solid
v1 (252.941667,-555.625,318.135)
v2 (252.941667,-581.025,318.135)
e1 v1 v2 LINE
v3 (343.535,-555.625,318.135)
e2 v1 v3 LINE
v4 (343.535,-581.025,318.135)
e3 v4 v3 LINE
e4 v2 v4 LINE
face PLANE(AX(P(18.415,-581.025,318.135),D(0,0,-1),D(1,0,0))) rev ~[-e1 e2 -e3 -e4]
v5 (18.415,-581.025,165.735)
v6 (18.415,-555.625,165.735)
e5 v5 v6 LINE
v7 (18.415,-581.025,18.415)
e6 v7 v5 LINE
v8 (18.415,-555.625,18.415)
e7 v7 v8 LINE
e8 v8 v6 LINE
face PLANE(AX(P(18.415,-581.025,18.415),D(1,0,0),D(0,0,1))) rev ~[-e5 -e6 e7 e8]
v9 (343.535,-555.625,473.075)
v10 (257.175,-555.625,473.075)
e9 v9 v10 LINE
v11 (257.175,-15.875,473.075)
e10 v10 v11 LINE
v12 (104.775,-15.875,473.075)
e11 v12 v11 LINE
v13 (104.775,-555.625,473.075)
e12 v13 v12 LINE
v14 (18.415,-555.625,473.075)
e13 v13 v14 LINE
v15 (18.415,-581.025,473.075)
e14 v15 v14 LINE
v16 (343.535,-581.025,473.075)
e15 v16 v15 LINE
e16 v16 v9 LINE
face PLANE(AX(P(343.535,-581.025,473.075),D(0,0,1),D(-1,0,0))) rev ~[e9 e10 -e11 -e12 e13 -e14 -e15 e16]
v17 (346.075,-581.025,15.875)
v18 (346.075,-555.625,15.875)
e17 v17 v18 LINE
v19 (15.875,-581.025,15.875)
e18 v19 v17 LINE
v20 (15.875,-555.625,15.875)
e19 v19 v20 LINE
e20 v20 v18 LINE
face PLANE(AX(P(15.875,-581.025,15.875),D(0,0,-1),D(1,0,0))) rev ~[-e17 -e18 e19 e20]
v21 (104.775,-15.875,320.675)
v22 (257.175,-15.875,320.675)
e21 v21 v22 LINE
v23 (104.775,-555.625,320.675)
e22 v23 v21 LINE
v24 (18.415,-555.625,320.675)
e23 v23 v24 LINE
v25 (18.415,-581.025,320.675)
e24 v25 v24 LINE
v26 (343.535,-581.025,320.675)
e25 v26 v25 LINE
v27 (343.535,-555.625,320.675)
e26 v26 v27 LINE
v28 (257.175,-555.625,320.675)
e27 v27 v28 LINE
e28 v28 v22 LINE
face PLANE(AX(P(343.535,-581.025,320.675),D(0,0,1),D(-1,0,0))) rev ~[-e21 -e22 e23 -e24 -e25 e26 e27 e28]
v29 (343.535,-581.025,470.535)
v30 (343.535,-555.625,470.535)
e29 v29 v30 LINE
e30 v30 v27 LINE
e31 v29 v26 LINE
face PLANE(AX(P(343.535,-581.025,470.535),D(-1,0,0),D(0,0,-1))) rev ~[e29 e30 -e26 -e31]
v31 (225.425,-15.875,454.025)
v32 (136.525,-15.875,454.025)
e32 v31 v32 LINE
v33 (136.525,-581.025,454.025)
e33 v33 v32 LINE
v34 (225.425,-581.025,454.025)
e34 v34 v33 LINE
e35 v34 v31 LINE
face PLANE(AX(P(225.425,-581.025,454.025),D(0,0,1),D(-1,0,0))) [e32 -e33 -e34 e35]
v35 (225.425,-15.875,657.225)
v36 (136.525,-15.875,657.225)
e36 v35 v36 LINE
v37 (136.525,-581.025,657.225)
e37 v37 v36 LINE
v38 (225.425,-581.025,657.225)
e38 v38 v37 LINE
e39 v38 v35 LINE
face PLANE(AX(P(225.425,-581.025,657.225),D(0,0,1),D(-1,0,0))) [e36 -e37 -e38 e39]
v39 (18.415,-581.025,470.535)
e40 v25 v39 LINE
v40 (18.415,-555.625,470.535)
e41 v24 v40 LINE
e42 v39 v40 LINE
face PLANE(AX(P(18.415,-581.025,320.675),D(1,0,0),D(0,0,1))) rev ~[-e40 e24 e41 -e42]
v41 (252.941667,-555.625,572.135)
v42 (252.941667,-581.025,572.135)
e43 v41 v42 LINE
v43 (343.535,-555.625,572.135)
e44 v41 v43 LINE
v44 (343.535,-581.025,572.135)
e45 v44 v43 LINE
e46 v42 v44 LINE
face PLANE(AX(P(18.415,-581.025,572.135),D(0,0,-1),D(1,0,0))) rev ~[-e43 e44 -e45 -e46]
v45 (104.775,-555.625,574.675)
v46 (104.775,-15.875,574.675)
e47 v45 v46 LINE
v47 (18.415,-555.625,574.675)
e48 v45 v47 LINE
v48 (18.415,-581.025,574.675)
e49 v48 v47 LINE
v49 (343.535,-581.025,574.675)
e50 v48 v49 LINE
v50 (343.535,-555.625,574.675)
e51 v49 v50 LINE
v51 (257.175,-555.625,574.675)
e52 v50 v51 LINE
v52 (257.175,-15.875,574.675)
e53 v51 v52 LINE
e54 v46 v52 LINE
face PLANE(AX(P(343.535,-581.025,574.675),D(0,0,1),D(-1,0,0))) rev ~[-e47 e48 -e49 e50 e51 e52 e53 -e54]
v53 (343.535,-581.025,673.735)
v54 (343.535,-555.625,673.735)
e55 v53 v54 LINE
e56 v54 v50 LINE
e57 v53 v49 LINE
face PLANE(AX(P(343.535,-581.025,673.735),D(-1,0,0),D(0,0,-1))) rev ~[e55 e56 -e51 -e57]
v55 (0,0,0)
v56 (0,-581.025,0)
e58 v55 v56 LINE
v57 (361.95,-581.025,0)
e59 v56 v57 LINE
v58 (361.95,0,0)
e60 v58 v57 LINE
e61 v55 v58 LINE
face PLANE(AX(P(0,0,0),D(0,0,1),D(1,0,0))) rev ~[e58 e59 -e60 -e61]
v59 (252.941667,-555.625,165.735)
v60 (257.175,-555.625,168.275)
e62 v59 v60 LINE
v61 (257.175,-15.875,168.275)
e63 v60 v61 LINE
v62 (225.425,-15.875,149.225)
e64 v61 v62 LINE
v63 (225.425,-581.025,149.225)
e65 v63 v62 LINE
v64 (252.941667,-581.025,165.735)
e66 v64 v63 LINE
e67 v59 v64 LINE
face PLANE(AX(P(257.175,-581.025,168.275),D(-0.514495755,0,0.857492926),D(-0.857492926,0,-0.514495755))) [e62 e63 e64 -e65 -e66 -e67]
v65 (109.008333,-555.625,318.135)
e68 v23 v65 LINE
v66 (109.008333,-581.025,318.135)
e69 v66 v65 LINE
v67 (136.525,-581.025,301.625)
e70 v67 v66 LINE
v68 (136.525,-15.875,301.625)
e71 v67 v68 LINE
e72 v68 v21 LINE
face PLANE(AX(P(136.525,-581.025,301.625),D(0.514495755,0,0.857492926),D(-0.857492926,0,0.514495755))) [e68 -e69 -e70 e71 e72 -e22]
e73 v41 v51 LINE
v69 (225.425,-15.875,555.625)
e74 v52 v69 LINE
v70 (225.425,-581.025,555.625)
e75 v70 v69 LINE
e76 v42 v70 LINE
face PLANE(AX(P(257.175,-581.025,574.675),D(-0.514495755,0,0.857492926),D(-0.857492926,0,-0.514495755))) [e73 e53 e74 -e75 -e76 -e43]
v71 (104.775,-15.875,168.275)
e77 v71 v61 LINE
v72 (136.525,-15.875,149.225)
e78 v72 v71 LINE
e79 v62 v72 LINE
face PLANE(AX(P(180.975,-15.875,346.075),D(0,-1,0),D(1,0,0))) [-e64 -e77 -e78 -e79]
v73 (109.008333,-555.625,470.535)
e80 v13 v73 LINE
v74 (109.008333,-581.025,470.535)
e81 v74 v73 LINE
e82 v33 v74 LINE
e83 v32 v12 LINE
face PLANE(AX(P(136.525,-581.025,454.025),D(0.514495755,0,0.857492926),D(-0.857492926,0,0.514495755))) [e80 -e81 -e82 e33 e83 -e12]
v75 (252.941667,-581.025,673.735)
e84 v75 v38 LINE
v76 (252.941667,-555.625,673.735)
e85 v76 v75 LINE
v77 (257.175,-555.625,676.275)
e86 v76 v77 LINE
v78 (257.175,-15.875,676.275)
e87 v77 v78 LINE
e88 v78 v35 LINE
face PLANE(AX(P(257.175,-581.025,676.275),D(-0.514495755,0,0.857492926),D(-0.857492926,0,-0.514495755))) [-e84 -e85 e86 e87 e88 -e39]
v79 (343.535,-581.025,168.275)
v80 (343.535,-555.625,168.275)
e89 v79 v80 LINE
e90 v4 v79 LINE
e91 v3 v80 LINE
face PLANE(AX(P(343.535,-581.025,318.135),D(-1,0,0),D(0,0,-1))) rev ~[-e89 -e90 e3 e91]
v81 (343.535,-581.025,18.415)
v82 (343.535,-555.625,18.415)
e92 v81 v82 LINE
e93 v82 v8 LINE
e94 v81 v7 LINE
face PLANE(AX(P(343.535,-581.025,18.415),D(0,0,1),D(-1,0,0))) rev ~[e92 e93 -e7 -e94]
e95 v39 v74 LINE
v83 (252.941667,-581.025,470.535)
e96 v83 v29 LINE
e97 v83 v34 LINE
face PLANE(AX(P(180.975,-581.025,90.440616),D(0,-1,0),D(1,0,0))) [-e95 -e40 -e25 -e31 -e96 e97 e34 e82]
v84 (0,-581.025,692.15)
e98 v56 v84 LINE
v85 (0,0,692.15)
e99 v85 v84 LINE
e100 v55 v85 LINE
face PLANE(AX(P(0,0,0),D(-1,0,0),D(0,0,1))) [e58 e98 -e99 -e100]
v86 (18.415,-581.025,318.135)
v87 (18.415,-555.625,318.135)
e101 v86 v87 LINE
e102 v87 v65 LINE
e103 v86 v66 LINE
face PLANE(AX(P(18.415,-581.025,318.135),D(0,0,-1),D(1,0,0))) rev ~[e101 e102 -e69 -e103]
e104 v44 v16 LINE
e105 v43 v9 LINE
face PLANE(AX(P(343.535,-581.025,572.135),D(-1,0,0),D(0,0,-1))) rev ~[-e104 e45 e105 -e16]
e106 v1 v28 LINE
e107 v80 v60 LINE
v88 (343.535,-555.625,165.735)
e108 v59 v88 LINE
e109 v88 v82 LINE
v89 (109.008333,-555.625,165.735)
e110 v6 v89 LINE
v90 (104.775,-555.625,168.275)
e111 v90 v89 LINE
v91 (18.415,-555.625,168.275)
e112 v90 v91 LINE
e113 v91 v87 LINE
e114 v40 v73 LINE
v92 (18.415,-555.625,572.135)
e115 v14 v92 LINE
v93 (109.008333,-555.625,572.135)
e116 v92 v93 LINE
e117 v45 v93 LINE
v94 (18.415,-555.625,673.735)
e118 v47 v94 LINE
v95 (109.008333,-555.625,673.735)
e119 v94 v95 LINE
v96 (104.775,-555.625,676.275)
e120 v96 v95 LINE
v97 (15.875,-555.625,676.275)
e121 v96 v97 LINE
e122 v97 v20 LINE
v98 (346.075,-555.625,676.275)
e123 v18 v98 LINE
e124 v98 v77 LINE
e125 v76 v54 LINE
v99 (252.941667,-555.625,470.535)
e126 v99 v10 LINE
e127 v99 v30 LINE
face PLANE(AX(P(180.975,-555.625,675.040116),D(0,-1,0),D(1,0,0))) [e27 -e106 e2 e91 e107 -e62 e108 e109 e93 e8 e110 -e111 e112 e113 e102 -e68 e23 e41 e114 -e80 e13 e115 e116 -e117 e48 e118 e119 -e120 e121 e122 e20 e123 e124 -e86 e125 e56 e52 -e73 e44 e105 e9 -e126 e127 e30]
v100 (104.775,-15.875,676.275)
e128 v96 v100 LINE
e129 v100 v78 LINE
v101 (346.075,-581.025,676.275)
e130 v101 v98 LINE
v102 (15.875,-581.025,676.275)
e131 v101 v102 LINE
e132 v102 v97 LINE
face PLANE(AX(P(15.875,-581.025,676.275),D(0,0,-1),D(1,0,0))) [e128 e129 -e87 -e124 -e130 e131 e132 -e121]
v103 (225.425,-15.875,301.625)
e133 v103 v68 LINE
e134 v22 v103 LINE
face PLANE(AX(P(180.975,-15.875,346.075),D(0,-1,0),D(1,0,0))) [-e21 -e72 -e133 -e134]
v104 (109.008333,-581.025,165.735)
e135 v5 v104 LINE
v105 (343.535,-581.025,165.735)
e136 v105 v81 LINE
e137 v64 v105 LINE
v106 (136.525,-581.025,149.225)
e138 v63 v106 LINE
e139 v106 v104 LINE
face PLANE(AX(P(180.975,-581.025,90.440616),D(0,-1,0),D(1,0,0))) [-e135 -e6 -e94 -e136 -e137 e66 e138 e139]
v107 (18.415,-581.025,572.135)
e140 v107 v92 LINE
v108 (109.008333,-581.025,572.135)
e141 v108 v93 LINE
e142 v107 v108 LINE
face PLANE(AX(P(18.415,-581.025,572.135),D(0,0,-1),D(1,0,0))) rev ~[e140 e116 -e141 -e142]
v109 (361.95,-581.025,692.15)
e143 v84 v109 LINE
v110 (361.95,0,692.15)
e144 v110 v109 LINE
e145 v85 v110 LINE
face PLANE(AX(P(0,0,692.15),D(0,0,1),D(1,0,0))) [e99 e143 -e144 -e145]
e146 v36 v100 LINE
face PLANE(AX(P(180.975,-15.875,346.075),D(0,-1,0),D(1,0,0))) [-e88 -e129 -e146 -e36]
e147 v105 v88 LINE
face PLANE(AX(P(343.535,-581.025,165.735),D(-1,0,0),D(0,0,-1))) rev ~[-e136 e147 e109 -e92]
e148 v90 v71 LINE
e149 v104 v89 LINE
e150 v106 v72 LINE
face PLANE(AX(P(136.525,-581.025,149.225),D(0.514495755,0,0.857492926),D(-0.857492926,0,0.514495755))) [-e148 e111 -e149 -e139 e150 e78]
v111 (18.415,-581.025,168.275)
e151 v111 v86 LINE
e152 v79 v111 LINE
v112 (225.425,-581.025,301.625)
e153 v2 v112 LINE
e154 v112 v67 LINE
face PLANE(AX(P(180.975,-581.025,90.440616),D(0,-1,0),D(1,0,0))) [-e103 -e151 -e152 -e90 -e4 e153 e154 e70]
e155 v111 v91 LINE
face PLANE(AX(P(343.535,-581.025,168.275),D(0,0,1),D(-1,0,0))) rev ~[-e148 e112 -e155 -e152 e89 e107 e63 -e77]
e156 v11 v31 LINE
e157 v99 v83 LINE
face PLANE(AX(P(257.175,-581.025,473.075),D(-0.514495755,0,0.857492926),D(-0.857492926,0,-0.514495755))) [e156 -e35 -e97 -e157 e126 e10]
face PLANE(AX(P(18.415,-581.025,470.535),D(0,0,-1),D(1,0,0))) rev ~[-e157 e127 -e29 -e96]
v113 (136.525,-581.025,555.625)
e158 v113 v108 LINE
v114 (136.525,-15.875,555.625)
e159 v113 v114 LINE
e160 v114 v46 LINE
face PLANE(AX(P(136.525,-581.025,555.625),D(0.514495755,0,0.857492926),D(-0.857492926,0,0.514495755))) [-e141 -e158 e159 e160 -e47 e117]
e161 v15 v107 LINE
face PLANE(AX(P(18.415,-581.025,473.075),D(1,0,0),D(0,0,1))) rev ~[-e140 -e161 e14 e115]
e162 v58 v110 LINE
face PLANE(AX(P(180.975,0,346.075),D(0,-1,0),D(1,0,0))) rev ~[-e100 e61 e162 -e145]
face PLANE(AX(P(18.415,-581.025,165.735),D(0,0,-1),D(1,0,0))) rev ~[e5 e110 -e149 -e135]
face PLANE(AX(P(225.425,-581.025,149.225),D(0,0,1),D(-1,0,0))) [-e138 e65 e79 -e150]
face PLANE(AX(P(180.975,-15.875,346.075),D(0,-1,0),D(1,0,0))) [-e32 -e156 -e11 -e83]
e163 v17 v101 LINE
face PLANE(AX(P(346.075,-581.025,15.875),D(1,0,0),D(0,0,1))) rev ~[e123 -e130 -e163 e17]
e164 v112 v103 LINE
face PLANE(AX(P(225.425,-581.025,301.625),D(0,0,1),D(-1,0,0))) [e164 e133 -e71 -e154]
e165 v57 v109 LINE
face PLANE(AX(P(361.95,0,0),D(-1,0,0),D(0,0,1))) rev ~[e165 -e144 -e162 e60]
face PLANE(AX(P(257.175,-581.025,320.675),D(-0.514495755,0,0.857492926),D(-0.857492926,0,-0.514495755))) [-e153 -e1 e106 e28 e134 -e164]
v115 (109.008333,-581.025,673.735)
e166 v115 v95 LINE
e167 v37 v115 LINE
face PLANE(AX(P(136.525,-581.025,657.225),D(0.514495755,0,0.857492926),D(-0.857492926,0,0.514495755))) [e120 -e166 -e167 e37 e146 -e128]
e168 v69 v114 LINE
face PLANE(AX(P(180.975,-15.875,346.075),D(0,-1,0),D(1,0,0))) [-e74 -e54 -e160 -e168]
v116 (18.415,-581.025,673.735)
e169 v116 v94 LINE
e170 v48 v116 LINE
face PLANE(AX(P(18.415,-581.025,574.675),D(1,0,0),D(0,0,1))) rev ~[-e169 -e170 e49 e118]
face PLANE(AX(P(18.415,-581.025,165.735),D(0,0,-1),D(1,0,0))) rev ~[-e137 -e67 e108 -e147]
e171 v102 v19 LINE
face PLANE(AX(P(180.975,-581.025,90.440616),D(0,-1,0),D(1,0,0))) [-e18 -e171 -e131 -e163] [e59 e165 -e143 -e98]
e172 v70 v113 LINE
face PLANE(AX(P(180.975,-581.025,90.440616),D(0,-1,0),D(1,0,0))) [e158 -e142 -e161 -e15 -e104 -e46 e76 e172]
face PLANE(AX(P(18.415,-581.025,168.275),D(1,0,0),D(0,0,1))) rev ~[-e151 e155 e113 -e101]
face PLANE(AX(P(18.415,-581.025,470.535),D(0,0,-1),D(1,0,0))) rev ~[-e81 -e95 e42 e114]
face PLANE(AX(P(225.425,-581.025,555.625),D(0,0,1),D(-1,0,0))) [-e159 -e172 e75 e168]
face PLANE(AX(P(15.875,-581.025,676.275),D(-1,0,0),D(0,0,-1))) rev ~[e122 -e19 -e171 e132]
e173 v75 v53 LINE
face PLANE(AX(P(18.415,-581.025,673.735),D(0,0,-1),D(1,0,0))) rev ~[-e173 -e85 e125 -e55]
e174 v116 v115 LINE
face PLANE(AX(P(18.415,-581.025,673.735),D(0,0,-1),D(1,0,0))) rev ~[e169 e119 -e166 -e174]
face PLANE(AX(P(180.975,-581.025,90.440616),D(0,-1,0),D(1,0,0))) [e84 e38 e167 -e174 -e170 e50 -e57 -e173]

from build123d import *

# Parameters (mm, degrees)
F0_W     = 361.95
F0_H     = 692.15
F1_DEPTH = 581.025
F2_W     = 330.2
F2_H     = 660.4
F3_DEPTH = 565.15
F5_DEPTH = 565.15
F7_DEPTH = 25.4


# Not quite as in the source:
# - a feature names something its author has since deleted; it is built from what else it names


with BuildPart() as f1:
    # F0 (on Front) → F1 (new body)
    with BuildSketch(Plane.XZ):
        with Locations((180.975, 346.075)):
            Rectangle(F0_W, F0_H)
    extrude(amount=F1_DEPTH)

    # F2 (on face) → F3 (cut)
    with BuildSketch(Plane.XZ.offset(581.025)):
        with Locations((180.975, 346.075)):
            Rectangle(F2_W, F2_H)
    extrude(amount=-F3_DEPTH, mode=Mode.SUBTRACT)

    # F4 (on face) → F5 (join)
    with BuildSketch(Plane.XZ.offset(581.025)):
        Polygon((104.775, 168.275), (15.875, 168.275), (15.875, 15.875), (346.075, 15.875), (346.075, 168.275), (257.175, 168.275), (225.425, 149.225), (136.525, 149.225), align=None)
        Polygon((104.775, 676.275), (15.875, 676.275), (15.875, 574.675), (104.775, 574.675), (257.175, 574.675), (346.075, 574.675), (346.075, 676.275), (257.175, 676.275), (225.425, 657.225), (136.525, 657.225), align=None)
        Polygon((104.775, 574.675), (15.875, 574.675), (15.875, 473.075), (104.775, 473.075), (257.175, 473.075), (346.075, 473.075), (346.075, 574.675), (257.175, 574.675), (225.425, 555.625), (136.525, 555.625), align=None)
        Polygon((104.775, 473.075), (15.875, 473.075), (15.875, 320.675), (104.775, 320.675), (257.175, 320.675), (346.075, 320.675), (346.075, 473.075), (257.175, 473.075), (225.425, 454.025), (136.525, 454.025), align=None)
        Polygon((104.775, 320.675), (15.875, 320.675), (15.875, 168.275), (104.775, 168.275), (257.175, 168.275), (346.075, 168.275), (346.075, 320.675), (257.175, 320.675), (225.425, 301.625), (136.525, 301.625), align=None)
    extrude(amount=-F5_DEPTH)

    # F6 (on face) → F7 (cut)
    with BuildSketch(Plane.XZ.offset(581.025)):
        Polygon((257.175, 676.275), (104.775, 676.275), (109.0083333333, 673.735), (252.9416666667, 673.735), align=None)
        Polygon((104.775, 676.275), (15.875, 676.275), (15.875, 15.875), (346.075, 15.875), (346.075, 676.275), (257.175, 676.275), (252.9416666667, 673.735), (343.535, 673.735), (343.535, 574.675), (343.535, 572.135), (343.535, 473.075), (343.535, 470.535), (343.535, 320.675), (343.535, 318.135), (343.535, 168.275), (343.535, 165.735), (343.535, 18.415), (18.415, 18.415), (18.415, 165.735), (18.415, 168.275), (18.415, 318.135), (18.415, 320.675), (18.415, 470.535), (18.415, 473.075), (18.415, 572.135), (18.415, 574.675), (18.415, 673.735), (109.0083333333, 673.735), align=None)
        Polygon((257.175, 574.675), (104.775, 574.675), (109.0083333333, 572.135), (252.9416666667, 572.135), align=None)
        Polygon((104.775, 574.675), (18.415, 574.675), (18.415, 572.135), (109.0083333333, 572.135), align=None)
        Polygon((343.535, 572.135), (343.535, 574.675), (257.175, 574.675), (252.9416666667, 572.135), align=None)
        Polygon((343.535, 470.535), (343.535, 473.075), (257.175, 473.075), (252.9416666667, 470.535), align=None)
        Polygon((257.175, 473.075), (104.775, 473.075), (109.0083333333, 470.535), (252.9416666667, 470.535), align=None)
        Polygon((104.775, 473.075), (18.415, 473.075), (18.415, 470.535), (109.0083333333, 470.535), align=None)
        Polygon((257.175, 320.675), (104.775, 320.675), (109.0083333333, 318.135), (252.9416666667, 318.135), align=None)
        Polygon((104.775, 320.675), (18.415, 320.675), (18.415, 318.135), (109.0083333333, 318.135), align=None)
        Polygon((343.535, 318.135), (343.535, 320.675), (257.175, 320.675), (252.9416666667, 318.135), align=None)
        Polygon((343.535, 165.735), (343.535, 168.275), (257.175, 168.275), (252.9416666667, 165.735), align=None)
        Polygon((108.4452420473, 168.275), (104.775, 168.275), (109.0083333333, 165.735), (252.9416666667, 165.735), (257.175, 168.275), align=None)
        Polygon((104.775, 168.275), (18.415, 168.275), (18.415, 165.735), (109.0083333333, 165.735), align=None)
    extrude(amount=-F7_DEPTH, mode=Mode.SUBTRACT)


solid = f1.part
